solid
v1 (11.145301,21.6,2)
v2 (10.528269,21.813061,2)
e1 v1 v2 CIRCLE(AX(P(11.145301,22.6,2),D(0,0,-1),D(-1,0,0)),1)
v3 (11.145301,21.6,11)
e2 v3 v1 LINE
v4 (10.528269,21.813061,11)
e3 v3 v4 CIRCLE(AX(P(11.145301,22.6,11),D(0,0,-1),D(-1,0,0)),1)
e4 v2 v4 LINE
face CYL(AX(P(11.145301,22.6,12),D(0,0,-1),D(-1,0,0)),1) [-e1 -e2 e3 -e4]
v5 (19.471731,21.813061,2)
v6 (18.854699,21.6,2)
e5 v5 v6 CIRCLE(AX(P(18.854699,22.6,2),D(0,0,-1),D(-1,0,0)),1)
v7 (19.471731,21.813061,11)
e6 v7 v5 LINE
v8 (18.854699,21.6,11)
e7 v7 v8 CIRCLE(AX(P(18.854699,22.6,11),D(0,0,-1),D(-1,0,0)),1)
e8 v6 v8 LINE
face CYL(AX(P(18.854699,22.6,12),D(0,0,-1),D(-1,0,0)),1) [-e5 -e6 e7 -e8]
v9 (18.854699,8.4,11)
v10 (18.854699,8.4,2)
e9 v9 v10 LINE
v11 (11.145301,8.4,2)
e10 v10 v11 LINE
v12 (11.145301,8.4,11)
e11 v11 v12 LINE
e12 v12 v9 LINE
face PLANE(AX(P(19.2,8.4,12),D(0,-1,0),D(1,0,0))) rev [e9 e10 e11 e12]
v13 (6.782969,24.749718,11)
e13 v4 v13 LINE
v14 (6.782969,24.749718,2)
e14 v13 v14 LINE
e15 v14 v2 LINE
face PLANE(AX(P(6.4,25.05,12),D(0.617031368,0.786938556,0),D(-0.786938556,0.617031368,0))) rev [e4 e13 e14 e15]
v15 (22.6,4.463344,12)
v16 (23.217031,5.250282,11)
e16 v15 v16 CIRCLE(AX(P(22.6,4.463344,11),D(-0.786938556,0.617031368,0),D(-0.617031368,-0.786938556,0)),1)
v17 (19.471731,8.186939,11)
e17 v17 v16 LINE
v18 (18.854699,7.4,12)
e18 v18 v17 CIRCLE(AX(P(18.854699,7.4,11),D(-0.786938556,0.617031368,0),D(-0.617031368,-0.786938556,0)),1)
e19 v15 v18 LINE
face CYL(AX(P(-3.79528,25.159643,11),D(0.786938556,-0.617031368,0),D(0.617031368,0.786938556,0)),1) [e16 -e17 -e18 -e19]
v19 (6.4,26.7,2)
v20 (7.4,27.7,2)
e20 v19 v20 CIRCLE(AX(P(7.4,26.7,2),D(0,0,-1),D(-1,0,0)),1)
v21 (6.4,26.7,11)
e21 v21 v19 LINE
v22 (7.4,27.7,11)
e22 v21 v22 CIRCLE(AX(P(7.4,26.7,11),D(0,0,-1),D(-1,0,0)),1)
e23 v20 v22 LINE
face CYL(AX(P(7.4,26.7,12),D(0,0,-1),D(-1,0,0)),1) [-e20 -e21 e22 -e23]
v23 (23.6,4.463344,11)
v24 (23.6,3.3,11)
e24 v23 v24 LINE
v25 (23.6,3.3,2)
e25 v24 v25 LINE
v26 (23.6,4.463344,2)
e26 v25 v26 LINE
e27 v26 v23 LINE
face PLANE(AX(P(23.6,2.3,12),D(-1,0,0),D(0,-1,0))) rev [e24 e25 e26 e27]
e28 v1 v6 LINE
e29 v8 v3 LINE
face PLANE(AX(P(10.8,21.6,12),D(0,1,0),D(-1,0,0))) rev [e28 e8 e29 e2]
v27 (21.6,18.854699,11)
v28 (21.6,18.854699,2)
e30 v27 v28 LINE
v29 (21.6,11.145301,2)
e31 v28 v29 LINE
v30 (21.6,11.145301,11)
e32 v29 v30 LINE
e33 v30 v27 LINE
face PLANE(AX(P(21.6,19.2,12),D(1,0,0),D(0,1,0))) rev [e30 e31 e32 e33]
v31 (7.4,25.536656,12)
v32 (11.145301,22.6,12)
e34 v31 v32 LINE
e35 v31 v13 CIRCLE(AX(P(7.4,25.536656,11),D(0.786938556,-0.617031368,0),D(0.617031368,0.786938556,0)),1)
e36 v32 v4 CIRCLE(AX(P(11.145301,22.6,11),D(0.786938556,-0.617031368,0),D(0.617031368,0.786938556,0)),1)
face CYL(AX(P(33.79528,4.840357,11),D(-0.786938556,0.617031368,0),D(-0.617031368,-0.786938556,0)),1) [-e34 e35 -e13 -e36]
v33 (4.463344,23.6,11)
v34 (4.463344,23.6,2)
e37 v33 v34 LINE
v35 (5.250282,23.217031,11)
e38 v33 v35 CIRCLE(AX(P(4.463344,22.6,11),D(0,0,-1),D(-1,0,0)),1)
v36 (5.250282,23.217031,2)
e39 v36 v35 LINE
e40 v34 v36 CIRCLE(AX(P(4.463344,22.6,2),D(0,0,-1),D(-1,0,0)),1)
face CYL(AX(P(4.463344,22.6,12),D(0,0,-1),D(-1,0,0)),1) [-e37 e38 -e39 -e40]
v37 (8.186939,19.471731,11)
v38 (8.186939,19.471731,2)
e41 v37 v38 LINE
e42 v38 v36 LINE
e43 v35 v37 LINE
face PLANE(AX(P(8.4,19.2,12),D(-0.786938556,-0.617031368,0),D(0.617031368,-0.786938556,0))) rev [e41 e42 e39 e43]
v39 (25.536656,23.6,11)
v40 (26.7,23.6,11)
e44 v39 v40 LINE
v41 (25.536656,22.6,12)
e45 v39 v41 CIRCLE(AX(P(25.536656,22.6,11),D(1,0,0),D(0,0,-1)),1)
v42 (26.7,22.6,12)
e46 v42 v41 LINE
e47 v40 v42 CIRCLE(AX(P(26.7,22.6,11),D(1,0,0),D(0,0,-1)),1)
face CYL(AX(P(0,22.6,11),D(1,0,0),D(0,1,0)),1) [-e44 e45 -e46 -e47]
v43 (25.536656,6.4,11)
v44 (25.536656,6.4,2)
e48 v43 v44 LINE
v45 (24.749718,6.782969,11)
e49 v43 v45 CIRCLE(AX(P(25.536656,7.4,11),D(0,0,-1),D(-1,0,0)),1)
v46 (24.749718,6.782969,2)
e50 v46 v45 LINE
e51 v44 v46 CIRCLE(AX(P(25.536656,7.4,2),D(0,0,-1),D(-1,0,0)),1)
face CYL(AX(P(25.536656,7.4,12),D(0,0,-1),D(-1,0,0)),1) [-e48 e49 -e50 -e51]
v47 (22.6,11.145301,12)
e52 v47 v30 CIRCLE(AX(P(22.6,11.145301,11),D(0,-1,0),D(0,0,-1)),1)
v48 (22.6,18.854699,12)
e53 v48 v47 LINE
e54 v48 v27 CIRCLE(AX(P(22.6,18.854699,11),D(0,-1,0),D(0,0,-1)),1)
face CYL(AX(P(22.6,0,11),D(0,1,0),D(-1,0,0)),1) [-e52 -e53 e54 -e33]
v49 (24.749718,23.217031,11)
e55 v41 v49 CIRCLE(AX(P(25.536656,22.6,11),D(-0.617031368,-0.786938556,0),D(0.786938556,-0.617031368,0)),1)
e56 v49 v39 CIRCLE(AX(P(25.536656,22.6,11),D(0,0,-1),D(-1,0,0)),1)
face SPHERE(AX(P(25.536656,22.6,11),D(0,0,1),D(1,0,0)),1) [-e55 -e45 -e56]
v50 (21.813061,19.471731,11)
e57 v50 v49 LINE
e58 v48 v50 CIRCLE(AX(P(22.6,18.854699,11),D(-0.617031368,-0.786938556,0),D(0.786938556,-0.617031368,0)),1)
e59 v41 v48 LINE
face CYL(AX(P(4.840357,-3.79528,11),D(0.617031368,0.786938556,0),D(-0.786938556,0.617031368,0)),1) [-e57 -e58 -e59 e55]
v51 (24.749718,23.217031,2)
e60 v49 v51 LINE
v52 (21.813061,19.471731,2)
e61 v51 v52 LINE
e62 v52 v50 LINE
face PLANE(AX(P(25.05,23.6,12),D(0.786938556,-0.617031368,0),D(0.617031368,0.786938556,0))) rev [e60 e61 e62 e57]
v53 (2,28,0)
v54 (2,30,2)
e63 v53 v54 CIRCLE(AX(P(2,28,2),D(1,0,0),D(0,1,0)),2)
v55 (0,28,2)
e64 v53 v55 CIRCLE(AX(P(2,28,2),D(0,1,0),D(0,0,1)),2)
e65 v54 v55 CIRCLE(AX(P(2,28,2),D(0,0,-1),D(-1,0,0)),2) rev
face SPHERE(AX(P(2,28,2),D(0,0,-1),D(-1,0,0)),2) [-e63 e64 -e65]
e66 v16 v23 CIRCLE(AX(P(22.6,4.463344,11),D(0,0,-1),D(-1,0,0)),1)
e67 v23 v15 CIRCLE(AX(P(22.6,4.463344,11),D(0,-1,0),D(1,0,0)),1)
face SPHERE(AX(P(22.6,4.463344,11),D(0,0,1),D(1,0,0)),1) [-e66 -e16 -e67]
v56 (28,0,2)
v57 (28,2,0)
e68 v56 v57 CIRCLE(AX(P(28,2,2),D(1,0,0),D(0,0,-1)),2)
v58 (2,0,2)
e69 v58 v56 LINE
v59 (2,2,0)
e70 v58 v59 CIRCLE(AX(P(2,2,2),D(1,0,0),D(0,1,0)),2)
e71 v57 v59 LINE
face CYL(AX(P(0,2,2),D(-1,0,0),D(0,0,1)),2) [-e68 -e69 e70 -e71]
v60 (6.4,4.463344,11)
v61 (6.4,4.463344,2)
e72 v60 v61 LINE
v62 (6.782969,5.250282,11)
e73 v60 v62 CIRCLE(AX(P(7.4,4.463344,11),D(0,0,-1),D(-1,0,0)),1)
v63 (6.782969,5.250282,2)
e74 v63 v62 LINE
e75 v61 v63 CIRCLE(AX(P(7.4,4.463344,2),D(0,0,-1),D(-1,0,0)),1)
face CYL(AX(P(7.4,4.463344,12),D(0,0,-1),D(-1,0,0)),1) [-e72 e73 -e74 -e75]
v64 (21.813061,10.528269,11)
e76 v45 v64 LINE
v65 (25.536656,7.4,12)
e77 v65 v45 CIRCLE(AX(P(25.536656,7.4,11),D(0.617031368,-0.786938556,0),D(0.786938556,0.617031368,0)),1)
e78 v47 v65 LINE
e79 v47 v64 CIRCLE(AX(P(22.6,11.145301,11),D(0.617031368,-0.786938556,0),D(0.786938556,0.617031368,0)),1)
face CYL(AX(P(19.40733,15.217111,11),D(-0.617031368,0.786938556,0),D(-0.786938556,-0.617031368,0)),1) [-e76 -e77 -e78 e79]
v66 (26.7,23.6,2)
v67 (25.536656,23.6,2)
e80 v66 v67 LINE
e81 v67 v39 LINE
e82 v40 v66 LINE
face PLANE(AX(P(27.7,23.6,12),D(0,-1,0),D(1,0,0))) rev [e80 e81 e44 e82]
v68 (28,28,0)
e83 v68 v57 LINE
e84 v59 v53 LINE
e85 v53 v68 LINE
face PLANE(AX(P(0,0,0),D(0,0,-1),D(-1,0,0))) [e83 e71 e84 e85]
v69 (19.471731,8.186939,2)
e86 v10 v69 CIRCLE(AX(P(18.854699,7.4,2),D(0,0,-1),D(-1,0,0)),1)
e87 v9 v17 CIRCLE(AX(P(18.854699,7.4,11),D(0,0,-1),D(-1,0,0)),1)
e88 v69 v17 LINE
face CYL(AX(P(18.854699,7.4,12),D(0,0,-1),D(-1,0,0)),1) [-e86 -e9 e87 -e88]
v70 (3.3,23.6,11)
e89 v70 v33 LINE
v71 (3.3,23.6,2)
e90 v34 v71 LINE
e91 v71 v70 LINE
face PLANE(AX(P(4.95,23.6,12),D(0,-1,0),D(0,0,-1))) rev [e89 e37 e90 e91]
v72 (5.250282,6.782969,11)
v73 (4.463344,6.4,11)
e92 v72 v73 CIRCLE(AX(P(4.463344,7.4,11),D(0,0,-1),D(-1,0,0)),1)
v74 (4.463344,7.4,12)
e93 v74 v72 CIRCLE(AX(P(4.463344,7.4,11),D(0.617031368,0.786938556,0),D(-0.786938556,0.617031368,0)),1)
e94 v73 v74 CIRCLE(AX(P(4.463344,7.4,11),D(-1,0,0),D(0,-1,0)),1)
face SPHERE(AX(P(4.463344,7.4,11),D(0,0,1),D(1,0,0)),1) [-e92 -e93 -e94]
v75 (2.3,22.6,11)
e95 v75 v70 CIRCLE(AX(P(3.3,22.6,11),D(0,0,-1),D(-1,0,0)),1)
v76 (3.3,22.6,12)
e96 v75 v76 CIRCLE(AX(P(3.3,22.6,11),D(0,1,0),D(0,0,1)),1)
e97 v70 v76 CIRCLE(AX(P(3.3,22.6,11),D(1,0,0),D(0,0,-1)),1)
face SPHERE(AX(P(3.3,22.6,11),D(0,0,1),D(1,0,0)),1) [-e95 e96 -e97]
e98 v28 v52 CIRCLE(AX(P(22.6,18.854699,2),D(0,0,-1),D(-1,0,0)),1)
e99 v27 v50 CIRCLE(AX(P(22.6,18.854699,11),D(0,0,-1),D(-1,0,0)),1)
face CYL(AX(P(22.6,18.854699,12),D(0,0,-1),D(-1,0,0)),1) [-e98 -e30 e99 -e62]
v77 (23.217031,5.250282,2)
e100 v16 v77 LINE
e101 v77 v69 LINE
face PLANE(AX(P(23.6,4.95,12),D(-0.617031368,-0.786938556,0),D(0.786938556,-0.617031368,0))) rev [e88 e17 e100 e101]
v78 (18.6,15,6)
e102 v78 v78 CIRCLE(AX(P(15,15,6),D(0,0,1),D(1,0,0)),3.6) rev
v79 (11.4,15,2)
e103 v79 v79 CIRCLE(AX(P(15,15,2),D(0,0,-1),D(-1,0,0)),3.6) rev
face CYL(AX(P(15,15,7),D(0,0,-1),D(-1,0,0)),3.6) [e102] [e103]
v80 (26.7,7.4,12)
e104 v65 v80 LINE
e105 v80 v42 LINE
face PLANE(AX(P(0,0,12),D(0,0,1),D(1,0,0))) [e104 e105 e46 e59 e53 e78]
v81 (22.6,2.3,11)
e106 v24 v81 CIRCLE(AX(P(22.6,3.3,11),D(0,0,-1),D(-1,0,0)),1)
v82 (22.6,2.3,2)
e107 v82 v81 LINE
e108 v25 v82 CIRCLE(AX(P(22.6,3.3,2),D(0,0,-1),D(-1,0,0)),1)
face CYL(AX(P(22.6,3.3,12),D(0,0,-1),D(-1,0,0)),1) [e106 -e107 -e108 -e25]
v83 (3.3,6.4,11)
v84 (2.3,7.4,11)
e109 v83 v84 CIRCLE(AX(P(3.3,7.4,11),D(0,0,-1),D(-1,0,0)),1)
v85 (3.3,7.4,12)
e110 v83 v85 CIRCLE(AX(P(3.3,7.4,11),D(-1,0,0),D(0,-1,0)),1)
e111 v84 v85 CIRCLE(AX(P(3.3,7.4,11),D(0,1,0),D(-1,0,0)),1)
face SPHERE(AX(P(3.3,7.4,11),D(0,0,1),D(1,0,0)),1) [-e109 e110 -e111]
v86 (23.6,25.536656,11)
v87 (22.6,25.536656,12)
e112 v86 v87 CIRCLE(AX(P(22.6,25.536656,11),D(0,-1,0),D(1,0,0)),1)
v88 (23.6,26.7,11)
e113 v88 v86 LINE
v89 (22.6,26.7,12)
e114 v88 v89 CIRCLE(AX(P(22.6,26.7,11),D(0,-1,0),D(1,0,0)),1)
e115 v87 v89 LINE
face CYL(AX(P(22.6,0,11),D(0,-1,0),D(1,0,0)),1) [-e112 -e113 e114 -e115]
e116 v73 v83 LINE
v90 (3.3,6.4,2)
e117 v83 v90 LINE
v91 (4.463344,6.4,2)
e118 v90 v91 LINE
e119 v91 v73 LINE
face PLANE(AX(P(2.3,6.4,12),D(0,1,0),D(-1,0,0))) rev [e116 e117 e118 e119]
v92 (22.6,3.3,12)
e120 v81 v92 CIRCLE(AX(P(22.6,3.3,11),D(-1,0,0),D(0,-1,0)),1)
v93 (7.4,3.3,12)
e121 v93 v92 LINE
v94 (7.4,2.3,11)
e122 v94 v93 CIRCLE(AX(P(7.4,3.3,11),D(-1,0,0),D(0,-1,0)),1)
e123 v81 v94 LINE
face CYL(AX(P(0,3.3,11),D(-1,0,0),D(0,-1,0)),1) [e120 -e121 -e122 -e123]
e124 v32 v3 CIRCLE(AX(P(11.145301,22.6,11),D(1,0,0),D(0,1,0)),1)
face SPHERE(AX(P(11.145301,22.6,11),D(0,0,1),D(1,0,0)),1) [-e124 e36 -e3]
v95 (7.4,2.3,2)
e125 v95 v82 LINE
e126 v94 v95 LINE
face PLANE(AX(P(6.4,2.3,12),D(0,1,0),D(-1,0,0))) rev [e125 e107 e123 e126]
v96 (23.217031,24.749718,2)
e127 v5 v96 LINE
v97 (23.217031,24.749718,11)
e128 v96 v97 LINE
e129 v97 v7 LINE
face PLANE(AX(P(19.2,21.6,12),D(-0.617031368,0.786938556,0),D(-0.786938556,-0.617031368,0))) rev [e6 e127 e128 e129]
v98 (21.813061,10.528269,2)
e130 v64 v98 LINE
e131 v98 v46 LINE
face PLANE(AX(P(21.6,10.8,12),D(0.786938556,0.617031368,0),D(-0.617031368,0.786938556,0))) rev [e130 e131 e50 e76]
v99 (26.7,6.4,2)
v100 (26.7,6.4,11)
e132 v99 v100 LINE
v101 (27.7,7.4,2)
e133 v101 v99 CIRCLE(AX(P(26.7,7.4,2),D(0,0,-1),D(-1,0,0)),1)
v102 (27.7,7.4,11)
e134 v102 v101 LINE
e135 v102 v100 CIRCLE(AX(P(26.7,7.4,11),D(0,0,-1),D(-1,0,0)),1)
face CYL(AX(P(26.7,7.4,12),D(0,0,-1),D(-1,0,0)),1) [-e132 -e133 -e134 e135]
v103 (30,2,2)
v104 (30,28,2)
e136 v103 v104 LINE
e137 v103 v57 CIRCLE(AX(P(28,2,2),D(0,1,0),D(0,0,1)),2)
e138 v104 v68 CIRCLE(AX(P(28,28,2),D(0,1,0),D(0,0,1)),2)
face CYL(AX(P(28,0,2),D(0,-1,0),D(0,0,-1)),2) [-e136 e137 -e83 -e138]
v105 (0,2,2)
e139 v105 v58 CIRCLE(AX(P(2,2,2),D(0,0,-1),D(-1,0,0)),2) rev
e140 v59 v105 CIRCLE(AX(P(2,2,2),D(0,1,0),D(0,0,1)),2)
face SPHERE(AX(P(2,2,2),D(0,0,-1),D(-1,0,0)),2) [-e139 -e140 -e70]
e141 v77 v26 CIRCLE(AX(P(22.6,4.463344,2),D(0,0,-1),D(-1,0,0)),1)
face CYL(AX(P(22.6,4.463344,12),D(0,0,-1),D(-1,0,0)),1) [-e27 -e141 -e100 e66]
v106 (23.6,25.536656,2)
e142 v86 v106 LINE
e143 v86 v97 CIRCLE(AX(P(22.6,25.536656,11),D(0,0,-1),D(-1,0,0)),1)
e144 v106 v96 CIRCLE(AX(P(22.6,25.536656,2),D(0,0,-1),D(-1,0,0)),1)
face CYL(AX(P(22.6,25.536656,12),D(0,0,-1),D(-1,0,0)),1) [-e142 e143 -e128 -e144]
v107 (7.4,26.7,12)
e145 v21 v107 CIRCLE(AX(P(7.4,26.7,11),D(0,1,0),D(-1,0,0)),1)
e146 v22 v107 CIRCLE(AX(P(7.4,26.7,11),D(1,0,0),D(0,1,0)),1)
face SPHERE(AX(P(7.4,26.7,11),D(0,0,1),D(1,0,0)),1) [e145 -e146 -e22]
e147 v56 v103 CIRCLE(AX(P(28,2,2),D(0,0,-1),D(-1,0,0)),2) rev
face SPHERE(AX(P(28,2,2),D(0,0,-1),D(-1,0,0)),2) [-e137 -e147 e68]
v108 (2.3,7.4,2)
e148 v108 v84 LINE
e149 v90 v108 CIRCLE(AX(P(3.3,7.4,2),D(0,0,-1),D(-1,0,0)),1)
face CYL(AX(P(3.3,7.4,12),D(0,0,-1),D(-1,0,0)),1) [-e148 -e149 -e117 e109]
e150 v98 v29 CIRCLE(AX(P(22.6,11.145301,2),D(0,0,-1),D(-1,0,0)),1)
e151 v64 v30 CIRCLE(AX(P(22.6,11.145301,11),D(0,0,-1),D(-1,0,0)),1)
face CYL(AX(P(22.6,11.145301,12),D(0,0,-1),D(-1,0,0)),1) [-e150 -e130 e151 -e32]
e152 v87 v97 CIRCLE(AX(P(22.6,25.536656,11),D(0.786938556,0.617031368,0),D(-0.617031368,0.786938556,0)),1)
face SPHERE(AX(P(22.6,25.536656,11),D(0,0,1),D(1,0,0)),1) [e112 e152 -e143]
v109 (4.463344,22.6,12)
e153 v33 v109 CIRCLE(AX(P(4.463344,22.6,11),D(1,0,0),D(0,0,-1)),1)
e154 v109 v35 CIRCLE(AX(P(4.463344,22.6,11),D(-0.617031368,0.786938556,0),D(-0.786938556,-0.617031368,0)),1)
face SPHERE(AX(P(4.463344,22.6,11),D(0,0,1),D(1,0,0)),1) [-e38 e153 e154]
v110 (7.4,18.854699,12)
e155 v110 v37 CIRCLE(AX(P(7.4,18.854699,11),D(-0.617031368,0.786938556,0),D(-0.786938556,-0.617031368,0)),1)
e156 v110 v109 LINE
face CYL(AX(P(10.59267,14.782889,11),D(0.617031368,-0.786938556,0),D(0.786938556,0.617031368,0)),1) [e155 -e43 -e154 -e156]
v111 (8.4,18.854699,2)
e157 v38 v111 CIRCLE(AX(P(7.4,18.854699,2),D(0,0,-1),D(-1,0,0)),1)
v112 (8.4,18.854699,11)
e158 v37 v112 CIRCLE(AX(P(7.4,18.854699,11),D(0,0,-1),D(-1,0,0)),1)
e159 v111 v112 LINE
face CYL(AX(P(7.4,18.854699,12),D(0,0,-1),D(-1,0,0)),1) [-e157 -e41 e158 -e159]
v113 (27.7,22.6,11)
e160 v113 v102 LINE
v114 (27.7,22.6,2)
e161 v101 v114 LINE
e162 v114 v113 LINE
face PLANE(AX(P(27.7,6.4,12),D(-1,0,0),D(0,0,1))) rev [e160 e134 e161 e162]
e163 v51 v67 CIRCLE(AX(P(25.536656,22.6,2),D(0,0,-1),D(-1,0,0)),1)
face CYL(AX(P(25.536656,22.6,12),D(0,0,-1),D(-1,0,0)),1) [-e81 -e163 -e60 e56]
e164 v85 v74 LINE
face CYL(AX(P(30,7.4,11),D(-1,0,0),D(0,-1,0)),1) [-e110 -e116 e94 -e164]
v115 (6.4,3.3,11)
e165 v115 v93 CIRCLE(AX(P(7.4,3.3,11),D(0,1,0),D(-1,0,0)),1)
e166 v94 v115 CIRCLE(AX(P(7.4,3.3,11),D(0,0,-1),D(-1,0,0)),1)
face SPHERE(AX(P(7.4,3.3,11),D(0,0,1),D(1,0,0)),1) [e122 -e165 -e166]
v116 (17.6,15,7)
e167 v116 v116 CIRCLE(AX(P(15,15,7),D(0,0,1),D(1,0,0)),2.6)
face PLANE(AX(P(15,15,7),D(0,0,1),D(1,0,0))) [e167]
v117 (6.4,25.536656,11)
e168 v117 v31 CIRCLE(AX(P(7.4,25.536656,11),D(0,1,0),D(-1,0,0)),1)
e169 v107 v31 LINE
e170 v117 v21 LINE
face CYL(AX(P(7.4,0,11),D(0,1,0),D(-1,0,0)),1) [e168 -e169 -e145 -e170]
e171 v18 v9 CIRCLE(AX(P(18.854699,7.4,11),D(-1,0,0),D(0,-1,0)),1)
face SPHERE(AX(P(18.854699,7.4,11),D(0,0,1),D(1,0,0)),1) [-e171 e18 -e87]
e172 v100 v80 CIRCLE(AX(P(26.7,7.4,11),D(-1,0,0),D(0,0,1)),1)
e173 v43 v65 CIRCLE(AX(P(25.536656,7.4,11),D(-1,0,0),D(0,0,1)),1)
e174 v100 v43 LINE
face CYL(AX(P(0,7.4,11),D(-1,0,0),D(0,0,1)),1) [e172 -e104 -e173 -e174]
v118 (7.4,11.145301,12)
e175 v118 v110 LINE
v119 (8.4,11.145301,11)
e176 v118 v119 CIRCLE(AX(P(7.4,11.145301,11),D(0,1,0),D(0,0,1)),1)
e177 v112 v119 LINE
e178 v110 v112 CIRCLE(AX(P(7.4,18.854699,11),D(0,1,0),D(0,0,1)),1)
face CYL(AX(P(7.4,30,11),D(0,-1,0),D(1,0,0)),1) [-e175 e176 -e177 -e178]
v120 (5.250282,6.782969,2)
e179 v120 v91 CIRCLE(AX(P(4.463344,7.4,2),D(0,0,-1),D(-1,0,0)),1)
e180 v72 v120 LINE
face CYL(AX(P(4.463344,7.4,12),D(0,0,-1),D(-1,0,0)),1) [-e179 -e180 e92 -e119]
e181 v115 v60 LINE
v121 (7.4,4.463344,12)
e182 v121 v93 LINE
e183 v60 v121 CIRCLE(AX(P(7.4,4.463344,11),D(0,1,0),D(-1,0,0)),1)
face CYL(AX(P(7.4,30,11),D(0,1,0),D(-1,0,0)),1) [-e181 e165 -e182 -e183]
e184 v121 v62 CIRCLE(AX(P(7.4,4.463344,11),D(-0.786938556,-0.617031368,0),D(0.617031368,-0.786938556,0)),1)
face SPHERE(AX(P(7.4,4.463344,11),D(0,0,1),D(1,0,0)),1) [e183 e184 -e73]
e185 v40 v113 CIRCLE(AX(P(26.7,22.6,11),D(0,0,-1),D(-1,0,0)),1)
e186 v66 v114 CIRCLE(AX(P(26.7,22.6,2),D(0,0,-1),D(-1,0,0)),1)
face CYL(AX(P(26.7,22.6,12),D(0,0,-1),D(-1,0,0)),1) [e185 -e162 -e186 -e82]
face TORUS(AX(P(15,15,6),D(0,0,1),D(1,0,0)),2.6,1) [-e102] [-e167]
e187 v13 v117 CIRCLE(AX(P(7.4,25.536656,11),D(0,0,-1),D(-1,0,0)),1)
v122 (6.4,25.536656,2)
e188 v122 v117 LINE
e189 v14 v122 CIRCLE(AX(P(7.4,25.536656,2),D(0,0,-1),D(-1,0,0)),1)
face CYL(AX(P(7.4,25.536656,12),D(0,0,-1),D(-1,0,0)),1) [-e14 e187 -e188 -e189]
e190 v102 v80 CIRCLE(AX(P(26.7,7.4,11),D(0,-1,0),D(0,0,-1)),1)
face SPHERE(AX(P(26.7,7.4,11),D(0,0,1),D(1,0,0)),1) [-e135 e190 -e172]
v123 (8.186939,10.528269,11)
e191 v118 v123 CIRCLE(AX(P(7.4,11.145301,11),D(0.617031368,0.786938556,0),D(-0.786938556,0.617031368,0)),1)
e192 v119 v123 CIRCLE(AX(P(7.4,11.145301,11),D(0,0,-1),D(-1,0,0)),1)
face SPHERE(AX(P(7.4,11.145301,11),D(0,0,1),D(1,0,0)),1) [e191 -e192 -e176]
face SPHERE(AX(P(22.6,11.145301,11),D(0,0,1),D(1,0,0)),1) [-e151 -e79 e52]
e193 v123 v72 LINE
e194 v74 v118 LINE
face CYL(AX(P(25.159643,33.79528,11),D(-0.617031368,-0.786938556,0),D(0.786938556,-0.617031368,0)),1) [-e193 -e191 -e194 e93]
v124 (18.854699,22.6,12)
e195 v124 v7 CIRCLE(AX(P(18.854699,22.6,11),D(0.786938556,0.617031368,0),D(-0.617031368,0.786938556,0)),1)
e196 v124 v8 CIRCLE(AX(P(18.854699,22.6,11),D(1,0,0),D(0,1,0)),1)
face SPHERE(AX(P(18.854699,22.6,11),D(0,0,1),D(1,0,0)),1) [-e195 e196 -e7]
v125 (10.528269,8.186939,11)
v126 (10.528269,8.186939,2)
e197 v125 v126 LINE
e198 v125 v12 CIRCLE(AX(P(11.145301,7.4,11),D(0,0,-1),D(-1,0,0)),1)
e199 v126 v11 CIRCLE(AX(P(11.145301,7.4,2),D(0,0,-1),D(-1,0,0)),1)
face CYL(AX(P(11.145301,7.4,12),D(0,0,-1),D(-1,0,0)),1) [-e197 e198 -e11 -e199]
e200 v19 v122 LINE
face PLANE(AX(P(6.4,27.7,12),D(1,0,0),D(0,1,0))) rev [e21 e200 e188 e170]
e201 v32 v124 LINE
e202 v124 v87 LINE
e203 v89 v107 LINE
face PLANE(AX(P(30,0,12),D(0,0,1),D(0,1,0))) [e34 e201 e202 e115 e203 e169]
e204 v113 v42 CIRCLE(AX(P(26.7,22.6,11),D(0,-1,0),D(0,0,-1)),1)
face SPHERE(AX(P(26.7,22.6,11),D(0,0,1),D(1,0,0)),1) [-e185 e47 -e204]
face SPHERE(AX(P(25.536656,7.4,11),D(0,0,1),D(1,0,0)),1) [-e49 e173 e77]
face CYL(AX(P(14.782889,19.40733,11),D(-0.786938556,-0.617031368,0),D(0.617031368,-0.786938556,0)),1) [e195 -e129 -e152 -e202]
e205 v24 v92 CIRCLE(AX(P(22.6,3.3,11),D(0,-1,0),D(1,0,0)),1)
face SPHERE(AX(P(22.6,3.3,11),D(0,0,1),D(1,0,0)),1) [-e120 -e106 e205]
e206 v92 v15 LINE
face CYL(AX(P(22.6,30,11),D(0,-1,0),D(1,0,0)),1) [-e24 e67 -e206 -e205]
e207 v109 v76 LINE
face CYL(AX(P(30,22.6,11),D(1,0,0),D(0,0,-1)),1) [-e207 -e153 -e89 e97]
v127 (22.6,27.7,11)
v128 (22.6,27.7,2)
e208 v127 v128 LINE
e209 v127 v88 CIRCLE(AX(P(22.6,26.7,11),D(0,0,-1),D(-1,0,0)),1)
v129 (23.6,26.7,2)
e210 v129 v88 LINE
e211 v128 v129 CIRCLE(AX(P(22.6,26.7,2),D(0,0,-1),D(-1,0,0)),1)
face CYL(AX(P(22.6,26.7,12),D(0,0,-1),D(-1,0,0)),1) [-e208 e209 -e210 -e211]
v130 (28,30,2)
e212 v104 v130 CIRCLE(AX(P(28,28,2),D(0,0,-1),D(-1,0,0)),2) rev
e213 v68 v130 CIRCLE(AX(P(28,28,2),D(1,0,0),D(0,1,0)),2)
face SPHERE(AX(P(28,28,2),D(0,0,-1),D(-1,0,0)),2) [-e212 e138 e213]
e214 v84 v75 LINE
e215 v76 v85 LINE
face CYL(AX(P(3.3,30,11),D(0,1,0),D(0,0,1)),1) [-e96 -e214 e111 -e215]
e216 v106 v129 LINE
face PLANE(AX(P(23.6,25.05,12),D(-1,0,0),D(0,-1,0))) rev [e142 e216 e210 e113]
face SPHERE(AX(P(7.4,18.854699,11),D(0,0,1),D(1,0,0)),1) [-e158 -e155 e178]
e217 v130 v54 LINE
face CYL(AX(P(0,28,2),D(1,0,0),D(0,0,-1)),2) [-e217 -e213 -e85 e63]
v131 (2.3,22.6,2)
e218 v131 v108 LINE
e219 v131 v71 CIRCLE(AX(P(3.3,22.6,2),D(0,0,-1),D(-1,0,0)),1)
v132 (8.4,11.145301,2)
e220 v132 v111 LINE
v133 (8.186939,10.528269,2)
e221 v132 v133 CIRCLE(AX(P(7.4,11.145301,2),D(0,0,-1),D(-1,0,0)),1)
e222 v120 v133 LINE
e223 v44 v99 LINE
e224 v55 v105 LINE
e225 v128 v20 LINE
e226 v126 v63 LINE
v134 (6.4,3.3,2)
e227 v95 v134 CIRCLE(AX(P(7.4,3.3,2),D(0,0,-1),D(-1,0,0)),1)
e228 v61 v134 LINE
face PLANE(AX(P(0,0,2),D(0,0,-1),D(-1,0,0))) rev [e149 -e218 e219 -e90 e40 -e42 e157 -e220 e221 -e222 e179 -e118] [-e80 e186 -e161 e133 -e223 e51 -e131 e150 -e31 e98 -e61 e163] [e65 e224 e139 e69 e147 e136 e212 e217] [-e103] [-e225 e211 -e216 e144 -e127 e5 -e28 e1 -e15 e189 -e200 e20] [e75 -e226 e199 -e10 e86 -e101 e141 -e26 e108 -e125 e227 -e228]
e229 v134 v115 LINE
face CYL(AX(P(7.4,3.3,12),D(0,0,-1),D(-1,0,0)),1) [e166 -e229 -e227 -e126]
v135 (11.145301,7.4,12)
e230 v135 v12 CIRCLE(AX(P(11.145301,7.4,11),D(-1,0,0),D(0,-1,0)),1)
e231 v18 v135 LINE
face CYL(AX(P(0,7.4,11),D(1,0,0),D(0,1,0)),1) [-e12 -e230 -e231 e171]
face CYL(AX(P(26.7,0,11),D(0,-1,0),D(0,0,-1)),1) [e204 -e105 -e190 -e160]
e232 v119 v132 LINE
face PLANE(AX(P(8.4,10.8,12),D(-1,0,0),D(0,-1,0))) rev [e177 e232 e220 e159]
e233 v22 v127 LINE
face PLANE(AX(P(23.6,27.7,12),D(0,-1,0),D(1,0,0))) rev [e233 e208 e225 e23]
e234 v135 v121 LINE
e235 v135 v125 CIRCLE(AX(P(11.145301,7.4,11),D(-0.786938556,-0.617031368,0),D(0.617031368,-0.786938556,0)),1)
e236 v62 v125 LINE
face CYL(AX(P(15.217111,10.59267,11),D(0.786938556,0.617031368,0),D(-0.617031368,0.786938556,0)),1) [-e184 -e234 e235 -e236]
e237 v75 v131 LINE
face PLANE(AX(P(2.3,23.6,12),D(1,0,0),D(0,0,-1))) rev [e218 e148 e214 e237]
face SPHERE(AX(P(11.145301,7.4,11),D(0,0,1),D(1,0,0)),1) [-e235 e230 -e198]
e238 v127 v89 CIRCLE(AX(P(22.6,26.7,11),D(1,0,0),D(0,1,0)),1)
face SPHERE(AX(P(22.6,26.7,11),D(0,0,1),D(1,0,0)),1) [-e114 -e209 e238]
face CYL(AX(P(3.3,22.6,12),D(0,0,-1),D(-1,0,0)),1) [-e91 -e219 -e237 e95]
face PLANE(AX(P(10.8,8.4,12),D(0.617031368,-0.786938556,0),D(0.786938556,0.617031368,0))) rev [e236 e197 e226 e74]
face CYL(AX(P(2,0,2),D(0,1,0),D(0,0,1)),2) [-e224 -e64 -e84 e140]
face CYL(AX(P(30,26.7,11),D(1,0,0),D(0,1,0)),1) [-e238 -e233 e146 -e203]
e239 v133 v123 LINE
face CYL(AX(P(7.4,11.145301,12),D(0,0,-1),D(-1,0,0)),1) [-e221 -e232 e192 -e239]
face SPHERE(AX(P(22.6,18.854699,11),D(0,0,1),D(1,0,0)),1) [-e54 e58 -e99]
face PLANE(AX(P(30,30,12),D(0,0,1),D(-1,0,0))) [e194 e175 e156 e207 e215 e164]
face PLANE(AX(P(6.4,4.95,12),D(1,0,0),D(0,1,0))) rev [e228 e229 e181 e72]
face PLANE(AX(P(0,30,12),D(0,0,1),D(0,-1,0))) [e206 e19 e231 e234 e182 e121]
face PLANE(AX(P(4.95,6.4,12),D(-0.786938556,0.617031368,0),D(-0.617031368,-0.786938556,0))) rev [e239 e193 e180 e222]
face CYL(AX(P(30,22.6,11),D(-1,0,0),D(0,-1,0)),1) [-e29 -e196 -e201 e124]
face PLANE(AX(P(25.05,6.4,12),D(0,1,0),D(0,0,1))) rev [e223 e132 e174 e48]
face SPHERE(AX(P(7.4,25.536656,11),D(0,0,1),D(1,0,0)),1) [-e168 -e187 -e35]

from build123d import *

# Parameters (mm, degrees)
ESQUISSE1_W                        = 30
ESQUISSE1_H                        = 30
BOSS_EXTRU_1_DEPTH                 = 2
BOSS_EXTRU_5_DEPTH                 = 10
CONG_1_R                           = 1
ESQUISSE2_R                        = 3.6
BOSS_EXTRU_6_DEPTH                 = 5
R_P_TITION_CIRCULAIRE1_COUNT       = 4
CONG_1_OF_R_P_TITION_CIRCULAIRE1_R = 1
CONG_2_R                           = 2
CONG_3_R                           = 1
CONG_4_R                           = 2


with BuildPart() as part:
    # Esquisse1 → Boss.-Extru.1 (new body)
    with BuildSketch(Plane.XY):
        with Locations((15, 15)):
            Rectangle(ESQUISSE1_W, ESQUISSE1_H)
    extrude(amount=BOSS_EXTRU_1_DEPTH)

    # Esquisse5 → Boss.-Extru.5 (add)
    with BuildSketch(Plane.XY.offset(2)):
        Polygon((27.7, 6.4), (27.7, 23.6), (25.05, 23.6), (21.6, 19.2), (21.6, 10.8), (25.05, 6.4), align=None)
    boss_extru_5 = extrude(amount=BOSS_EXTRU_5_DEPTH)

    # Congé1
    cong_1_edges = [part.edges().sort_by_distance(p)[0] for p in [
        (25.05, 6.4, 7),
        (27.7, 6.4, 7),
        (27.7, 23.6, 7),
        (25.05, 23.6, 7),
        (21.6, 19.2, 7),
        (21.6, 10.8, 7),
    ]]
    fillet(cong_1_edges, radius=CONG_1_R)

    # Esquisse2 → Boss.-Extru.6 (add)
    with BuildSketch(Plane.XY.offset(2)):
        with Locations(Location((15, 15, 0), (0, 0, 180))):
            Circle(ESQUISSE2_R)
    extrude(amount=BOSS_EXTRU_6_DEPTH)

    # Répétition circulaire1: Boss.-Extru.5 ×4 about axis
    r_p_tition_circulaire1_axis = Axis((15, 15, 0), (0, 0, 1))
    for i in range(1, R_P_TITION_CIRCULAIRE1_COUNT):
        add(boss_extru_5.rotate(r_p_tition_circulaire1_axis, i * 360 / R_P_TITION_CIRCULAIRE1_COUNT))

    # Congé1 of Répétition circulaire1
    cong_1_of_r_p_tition_circulaire1_edges = [part.edges().sort_by_distance(p)[0] for p in [
        (23.6, 25.05, 7),
        (23.6, 27.7, 7),
        (6.4, 27.7, 7),
        (6.4, 25.05, 7),
        (10.8, 21.6, 7),
        (19.2, 21.6, 7),
        (4.95, 23.6, 7),
        (2.3, 23.6, 7),
        (2.3, 6.4, 7),
        (4.95, 6.4, 7),
        (8.4, 10.8, 7),
        (8.4, 19.2, 7),
        (6.4, 4.95, 7),
        (6.4, 2.3, 7),
        (23.6, 2.3, 7),
        (23.6, 4.95, 7),
        (19.2, 8.4, 7),
        (10.8, 8.4, 7),
    ]]
    fillet(cong_1_of_r_p_tition_circulaire1_edges, radius=CONG_1_OF_R_P_TITION_CIRCULAIRE1_R)

    # Congé2
    cong_2_edges = [part.edges().sort_by_distance(p)[0] for p in [
        (0, 30, 1),
        (30, 30, 1),
        (30, 0, 1),
        (0, 0, 1),
    ]]
    fillet(cong_2_edges, radius=CONG_2_R)

    # Congé3
    cong_3_edges = [part.edges().sort_by_distance(p)[0] for p in [
        (15, 27.7, 12),
        (23.6, 26.118328167, 12),
        (6.4, 26.118328167, 12),
        (8.655619048, 23.28138961, 12),
        (15, 21.6, 12),
        (21.344380952, 23.28138961, 12),
        (6.500824998, 25.099067124, 12),
        (10.818910387, 21.654764961, 12),
        (19.181089613, 21.654764961, 12),
        (23.499175002, 25.099067124, 12),
        (6.692893219, 27.407106781, 12),
        (23.307106781, 27.407106781, 12),
        (2.3, 15, 12),
        (3.881671833, 23.6, 12),
        (3.881671833, 6.4, 12),
        (6.71861039, 8.655619048, 12),
        (8.4, 15, 12),
        (6.71861039, 21.344380952, 12),
        (4.900932876, 6.500824998, 12),
        (8.345235039, 10.818910387, 12),
        (8.345235039, 19.181089613, 12),
        (4.900932876, 23.499175002, 12),
        (2.592893219, 6.692893219, 12),
        (2.592893219, 23.307106781, 12),
        (15, 2.3, 12),
        (6.4, 3.881671833, 12),
        (23.6, 3.881671833, 12),
        (21.344380952, 6.71861039, 12),
        (15, 8.4, 12),
        (8.655619048, 6.71861039, 12),
        (23.499175002, 4.900932876, 12),
        (19.181089613, 8.345235039, 12),
        (10.818910387, 8.345235039, 12),
        (6.500824998, 4.900932876, 12),
        (23.307106781, 2.592893219, 12),
        (6.692893219, 2.592893219, 12),
        (27.7, 15, 12),
        (26.118328167, 6.4, 12),
        (26.118328167, 23.6, 12),
        (23.28138961, 21.344380952, 12),
        (21.6, 15, 12),
        (23.28138961, 8.655619048, 12),
        (25.099067124, 23.499175002, 12),
        (21.654764961, 19.181089613, 12),
        (21.654764961, 10.818910387, 12),
        (25.099067124, 6.500824998, 12),
        (27.407106781, 23.307106781, 12),
        (27.407106781, 6.692893219, 12),
        (18.6, 15, 7),
    ]]
    fillet(cong_3_edges, radius=CONG_3_R)

    # Congé4
    cong_4_edges = [part.edges().sort_by_distance(p)[0] for p in [
        (29.414213562, 29.414213562, 0),
        (15, 30, 0),
        (0.585786438, 29.414213562, 0),
        (0, 15, 0),
        (0.585786438, 0.585786438, 0),
        (15, 0, 0),
        (29.414213562, 0.585786438, 0),
        (30, 15, 0),
    ]]
    fillet(cong_4_edges, radius=CONG_4_R - 0.0001)  # a hair under: the kernel refuses the full size


solid = part.part
